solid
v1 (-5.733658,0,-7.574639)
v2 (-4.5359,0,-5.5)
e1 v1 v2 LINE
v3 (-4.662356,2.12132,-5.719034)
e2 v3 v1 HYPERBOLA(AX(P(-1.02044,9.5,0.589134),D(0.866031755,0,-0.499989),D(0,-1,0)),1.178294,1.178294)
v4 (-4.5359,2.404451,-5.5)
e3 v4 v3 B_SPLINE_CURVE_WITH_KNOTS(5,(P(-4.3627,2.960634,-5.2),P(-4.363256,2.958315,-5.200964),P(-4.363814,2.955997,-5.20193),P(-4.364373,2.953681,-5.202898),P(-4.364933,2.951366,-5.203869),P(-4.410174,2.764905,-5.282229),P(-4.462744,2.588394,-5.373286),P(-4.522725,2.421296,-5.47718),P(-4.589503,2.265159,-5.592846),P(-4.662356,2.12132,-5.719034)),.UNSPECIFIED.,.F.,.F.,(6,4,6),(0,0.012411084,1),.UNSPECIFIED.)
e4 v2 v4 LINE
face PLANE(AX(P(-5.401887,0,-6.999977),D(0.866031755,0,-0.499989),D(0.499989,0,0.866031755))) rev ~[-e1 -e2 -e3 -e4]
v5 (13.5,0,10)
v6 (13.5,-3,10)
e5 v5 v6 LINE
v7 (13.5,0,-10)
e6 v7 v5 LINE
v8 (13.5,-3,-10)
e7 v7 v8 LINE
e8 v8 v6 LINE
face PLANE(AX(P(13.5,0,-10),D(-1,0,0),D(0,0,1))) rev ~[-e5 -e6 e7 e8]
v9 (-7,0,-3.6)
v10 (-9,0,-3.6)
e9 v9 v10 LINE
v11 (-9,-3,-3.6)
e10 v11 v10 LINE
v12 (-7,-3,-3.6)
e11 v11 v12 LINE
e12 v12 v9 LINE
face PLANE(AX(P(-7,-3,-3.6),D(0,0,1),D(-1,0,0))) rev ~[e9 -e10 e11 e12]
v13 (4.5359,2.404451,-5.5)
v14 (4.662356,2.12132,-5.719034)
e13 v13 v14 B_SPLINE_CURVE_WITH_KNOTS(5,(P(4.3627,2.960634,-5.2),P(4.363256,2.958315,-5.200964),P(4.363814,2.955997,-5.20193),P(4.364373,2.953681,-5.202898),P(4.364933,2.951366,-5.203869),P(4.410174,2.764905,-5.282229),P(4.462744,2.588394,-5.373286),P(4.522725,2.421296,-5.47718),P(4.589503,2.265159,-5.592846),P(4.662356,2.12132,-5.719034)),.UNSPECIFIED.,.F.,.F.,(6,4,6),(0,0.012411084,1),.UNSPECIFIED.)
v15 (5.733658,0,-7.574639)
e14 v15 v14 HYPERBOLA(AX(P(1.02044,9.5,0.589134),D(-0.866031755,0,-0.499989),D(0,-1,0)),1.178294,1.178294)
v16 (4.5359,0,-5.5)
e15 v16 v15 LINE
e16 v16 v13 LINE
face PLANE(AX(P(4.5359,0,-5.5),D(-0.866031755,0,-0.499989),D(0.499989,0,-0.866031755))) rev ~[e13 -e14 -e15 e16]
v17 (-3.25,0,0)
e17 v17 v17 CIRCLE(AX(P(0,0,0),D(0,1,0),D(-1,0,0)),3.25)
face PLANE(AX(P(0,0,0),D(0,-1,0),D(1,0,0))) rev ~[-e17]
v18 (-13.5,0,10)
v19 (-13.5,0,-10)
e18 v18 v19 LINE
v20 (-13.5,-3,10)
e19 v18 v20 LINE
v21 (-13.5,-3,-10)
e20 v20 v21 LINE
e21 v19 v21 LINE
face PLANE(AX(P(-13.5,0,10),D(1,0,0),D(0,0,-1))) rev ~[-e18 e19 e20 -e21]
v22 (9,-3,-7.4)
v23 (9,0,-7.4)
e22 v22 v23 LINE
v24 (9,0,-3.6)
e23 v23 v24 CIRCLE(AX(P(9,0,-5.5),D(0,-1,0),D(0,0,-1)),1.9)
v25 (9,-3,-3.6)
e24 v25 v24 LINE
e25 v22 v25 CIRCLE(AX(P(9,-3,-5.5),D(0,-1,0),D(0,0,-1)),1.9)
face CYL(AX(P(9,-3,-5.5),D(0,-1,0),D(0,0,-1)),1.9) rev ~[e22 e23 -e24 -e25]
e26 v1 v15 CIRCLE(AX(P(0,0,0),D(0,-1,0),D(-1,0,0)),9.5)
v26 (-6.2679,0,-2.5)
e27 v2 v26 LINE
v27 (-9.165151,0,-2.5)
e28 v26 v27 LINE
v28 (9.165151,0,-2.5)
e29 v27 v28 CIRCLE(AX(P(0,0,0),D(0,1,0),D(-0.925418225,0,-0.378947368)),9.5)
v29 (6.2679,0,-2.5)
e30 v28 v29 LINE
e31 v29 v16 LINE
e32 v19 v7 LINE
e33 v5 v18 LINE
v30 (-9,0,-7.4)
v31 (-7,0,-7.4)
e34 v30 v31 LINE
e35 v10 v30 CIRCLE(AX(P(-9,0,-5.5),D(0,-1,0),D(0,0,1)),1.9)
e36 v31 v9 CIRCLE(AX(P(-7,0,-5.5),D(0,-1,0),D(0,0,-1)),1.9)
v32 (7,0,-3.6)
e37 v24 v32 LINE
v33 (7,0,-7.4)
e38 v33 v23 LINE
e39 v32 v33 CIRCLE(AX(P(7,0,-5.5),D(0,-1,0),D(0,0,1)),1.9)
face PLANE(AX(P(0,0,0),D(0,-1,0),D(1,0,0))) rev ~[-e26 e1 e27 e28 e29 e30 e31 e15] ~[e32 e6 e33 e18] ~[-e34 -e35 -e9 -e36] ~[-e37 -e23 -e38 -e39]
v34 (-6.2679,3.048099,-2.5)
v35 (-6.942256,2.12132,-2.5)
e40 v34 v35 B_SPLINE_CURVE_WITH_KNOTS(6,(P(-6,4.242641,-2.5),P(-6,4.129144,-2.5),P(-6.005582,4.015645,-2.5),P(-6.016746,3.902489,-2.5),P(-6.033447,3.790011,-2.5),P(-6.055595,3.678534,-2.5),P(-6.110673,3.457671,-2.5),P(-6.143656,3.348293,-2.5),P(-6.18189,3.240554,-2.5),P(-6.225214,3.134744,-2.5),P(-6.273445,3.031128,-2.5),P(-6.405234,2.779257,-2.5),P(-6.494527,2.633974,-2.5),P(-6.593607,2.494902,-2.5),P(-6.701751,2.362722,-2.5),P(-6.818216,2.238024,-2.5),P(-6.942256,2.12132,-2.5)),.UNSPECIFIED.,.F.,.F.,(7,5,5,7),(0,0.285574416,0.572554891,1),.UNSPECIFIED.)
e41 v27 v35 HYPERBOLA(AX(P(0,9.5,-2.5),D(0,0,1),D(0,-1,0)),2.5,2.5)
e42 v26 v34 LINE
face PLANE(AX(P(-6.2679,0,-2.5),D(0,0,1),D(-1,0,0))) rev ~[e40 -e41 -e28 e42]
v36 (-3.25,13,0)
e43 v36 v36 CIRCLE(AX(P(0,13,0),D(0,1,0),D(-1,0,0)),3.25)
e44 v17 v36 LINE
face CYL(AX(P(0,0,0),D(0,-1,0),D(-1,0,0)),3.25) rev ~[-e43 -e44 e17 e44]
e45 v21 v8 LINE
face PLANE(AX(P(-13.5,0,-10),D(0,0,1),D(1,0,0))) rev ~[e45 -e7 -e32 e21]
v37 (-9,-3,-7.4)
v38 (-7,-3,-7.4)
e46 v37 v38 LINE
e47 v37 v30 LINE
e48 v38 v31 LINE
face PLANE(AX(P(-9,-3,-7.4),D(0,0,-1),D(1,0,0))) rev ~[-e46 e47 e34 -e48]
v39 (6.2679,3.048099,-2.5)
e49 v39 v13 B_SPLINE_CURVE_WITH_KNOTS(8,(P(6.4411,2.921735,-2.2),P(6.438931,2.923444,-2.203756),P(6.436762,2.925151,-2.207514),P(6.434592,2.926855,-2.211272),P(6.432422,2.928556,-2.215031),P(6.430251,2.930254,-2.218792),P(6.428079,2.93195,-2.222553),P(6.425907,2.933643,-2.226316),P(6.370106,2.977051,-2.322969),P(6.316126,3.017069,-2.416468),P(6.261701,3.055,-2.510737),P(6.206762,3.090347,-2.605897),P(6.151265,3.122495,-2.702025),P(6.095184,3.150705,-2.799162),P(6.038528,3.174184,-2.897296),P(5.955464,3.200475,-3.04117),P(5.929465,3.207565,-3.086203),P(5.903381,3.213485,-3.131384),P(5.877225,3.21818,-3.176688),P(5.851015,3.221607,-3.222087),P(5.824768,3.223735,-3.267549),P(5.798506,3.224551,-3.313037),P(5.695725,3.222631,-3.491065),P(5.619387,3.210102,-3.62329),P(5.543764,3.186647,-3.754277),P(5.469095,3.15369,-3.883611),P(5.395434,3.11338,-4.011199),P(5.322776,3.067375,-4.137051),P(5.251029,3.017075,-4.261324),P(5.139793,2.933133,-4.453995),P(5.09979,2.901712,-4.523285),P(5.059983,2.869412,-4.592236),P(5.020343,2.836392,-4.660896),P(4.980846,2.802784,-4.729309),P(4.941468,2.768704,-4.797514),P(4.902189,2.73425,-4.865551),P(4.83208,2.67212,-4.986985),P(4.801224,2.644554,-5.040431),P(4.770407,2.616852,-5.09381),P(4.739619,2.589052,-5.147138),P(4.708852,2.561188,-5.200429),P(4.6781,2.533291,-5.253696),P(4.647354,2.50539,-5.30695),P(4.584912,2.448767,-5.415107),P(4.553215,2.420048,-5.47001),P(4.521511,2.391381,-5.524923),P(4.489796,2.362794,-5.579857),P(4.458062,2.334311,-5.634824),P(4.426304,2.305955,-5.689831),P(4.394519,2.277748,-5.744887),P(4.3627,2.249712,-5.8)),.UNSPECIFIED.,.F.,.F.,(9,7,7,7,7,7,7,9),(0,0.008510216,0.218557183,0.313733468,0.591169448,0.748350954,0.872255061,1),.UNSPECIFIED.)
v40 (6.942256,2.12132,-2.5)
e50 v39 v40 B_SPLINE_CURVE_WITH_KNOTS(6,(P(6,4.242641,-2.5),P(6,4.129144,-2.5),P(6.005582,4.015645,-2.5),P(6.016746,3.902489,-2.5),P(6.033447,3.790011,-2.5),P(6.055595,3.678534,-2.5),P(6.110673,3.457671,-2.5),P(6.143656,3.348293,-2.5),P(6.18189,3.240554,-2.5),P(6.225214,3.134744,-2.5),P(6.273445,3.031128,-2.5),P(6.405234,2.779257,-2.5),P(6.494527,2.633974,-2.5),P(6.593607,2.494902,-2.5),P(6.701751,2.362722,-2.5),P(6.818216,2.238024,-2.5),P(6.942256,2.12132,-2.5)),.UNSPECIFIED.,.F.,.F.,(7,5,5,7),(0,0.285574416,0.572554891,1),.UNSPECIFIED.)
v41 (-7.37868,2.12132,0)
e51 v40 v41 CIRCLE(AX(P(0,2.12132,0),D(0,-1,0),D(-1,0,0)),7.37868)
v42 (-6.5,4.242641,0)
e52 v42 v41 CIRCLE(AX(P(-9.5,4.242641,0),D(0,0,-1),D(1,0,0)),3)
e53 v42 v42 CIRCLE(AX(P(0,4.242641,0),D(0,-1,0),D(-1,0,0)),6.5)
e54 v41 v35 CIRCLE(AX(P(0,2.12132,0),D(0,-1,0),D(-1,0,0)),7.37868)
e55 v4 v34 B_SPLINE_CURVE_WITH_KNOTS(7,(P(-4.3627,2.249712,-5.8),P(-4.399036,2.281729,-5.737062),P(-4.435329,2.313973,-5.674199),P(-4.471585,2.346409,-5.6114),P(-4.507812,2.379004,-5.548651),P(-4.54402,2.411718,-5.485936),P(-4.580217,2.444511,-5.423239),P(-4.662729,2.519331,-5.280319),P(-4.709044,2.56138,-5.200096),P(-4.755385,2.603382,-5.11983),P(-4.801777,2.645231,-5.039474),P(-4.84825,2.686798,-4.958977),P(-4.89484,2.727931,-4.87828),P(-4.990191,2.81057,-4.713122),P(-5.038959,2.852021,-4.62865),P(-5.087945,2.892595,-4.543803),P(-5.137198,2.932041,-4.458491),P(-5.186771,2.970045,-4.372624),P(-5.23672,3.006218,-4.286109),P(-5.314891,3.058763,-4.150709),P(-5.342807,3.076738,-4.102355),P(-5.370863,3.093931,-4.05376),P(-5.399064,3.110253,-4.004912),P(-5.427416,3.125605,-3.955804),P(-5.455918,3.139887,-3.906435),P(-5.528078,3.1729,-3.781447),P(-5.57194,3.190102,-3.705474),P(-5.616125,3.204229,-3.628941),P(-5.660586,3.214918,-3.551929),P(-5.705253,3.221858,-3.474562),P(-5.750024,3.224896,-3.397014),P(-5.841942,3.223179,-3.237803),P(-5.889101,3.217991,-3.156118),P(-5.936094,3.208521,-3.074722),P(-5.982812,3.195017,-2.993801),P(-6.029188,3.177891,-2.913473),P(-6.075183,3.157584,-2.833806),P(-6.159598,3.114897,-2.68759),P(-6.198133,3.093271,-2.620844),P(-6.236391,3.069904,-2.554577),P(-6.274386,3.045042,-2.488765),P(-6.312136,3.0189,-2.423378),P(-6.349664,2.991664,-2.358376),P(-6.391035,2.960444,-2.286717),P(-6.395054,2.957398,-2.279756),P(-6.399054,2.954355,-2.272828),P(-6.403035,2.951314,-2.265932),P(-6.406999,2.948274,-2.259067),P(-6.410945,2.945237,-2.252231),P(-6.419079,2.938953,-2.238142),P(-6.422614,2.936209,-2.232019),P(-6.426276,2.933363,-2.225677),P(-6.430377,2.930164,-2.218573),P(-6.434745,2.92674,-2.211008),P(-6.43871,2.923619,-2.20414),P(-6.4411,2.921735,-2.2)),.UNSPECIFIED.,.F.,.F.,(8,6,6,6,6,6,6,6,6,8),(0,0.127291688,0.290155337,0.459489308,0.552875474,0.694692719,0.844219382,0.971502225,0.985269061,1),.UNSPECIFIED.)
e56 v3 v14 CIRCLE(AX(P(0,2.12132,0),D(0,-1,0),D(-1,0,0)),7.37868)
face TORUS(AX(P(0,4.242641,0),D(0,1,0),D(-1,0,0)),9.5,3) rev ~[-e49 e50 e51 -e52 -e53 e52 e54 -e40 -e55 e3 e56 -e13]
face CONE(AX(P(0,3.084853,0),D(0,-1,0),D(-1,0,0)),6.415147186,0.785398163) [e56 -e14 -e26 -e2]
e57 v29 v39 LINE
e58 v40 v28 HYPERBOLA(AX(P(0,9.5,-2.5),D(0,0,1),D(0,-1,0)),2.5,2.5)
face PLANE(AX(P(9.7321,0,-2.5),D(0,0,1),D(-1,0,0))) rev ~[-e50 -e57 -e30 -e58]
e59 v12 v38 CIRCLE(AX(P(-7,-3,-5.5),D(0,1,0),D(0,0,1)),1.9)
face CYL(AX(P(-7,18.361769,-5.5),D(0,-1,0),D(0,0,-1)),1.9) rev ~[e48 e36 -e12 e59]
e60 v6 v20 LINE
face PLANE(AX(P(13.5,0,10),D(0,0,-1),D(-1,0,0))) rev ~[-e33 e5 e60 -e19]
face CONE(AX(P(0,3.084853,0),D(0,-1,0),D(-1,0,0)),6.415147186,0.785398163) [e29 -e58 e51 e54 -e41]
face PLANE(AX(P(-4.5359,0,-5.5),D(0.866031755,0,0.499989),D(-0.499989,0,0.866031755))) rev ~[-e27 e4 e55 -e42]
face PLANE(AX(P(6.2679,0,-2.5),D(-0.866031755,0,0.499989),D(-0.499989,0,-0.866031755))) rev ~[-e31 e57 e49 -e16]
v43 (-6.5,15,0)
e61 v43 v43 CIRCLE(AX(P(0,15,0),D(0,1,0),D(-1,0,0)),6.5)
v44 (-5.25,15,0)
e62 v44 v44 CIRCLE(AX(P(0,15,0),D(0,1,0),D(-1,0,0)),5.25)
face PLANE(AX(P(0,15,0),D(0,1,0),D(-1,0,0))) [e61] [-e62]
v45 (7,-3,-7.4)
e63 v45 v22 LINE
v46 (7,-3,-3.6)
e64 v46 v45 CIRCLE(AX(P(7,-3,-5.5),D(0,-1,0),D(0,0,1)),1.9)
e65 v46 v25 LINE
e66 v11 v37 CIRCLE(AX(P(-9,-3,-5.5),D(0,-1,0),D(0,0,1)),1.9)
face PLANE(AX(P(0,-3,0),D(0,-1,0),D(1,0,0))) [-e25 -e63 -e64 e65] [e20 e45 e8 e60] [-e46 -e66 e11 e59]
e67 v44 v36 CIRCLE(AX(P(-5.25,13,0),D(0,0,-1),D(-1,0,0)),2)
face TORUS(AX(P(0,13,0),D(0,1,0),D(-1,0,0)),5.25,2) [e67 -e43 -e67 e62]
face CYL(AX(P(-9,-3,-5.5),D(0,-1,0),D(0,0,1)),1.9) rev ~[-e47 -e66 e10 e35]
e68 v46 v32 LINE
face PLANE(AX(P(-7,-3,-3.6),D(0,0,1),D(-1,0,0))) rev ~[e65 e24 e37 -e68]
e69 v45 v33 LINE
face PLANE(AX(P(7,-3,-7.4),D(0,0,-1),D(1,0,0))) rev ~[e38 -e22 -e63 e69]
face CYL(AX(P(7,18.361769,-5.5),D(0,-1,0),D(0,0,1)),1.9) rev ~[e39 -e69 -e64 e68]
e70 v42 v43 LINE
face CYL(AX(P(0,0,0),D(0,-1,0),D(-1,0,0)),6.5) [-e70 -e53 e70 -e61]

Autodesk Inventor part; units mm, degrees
ref_plane "YZ Plane" through (0, 0, 0) normal (1, 0, 0) x (0, 1, 0)
ref_plane "XZ Plane" through (0, 0, 0) normal (0, 1, 0) x (-1, 0, 0)
ref_plane "XY Plane" through (0, 0, 0) normal (0, 0, 1) x (1, 0, 0)
sketch "Schizzo1" plane through (0, 0, 0) normal (0, 1, 0) x (-1, 0, 0)
  circle A0 centre (0, 0) radius 3.25
  circle A1 centre (0, 0) radius 6.5
  dimension "d0" = 6.5
  dimension "d1" = 13
extrude "Estrusione1" add sketch "Schizzo1" along normal blind 15
sketch "Schizzo2" plane through (0, 0, 0) normal (0, -1, 0) x (1, 0, 0)
  line L0 (-13.5, -10) -> (13.5, -10)
  line L1 (13.5, -10) -> (13.5, 10)
  line L2 (13.5, 10) -> (-13.5, 10)
  line L3 (-13.5, 10) -> (-13.5, -10)
  line L4 (-13.5, -10) -> (13.5, 10) construction
  line L5 (13.5, -10) -> (-13.5, 10) construction
  point P0 (0, 0)
  point P1 (0, 0)
  point P2 (0, 0)
  dimension "d4" = 20
  dimension "d5" = 27
extrude "Estrusione2" add sketch "Schizzo2" along normal blind 3
sketch "Schizzo3" plane through (0, -3, 0) normal (0, -1, 0) x (1, 0, 0)
  line L0 (0, 0) -> (-8, 0)
  line L1 (0, 0) -> (8, 0) construction
  line L2 (-8, 0) -> (-8, -5.5)
  line L3 (0, 0) -> (8, 0)
  line L4 (0, 0) -> (8, 0) construction
  line L5 (8, 0) -> (8, -5.5)
  circle A0 centre (0, 0) radius 6.5 projected
  circle A1 centre (0, 0) radius 9.5 projected
  line L6 (-20.3813, -5.5) -> (-15.9716, -5.5)
  line L7 (-20.3813, -5.5) -> (-15.9716, -5.5) construction
  line L8 (-9, -5.5) -> (-7, -5.5)
  line L9 (-9, -5.5) -> (-7, -5.5) construction
  line L10 (-9, -5.5) -> (-7, -5.5) construction
  line L11 (-9, -7.4) -> (-7, -7.4)
  line L12 (-7, -3.6) -> (-9, -3.6)
  arc A2 (-9, -3.6) -> (-9, -7.4) centre (-9, -5.5) ccw
  arc A3 (-7, -7.4) -> (-7, -3.6) centre (-7, -5.5) ccw
  line L13 (7, -5.5) -> (9, -5.5)
  line L14 (7, -5.5) -> (9, -5.5) construction
  line L15 (7, -5.5) -> (9, -5.5) construction
  line L16 (7, -7.4) -> (9, -7.4)
  line L17 (9, -3.6) -> (7, -3.6)
  arc A4 (7, -3.6) -> (7, -7.4) centre (7, -5.5) ccw
  arc A5 (9, -7.4) -> (9, -3.6) centre (9, -5.5) ccw
  point P0 (2.8723, -8)
  point P1 (13.5, -10)
  point P2 (-13.5, -10)
  point P3 (8, -5.5)
  point P4 (0, -10)
  point P5 (0, 10)
  dimension "d21" = 8
  dimension "d22" = 180
  dimension "d23" = 5.5
  dimension "d24" = 90
  dimension "d25" = 8
  dimension "d26" = 0
  dimension "d27" = 5.5
  dimension "d28" = 90
  dimension "d31" = 0
  dimension "d32" = 0
  dimension "d33" = 2
  dimension "d34" = 3.8
  dimension "d35" = 0
  dimension "d36" = 3.8
  dimension "d37" = 2
extrude "Estrusione3" cut sketch "Schizzo3" against normal blind 10 contours L12 A3 A1 L2 | L2 A1 L12 | L17 A1 L5 | L5 A1 A4 L17 | A1 L8 L2 | L2 L8 A1 A3 L11 A2 L12 | A1 L17 A5 L16 A4 L13 L5 | L5 L13 A1
fillet "Raccordo2" radius 2 1 edges at (3.25, 15, 0)
chamfer "Smusso2" distance 3 angle 45 1 edges at (6.5, 0, 0)
fillet "Raccordo3" radius 3 1 edges at (6.5, 3, 0)
sketch "Schizzo4" plane through (0, 0, 0) normal (0, 1, 0) x (1, 0, 0)
  arc A0 (9, 3.6) -> (9, 7.4) centre (9, 5.5) ccw projected
  arc A1 (7, 7.4) -> (7, 3.6) centre (7, 5.5) ccw projected
  line L0 (9, 5.5) -> (7, 5.5)
  arc A2 (-9, 7.4) -> (-9, 3.6) centre (-9, 5.5) ccw projected
  arc A3 (-7, 3.6) -> (-7, 7.4) centre (-7, 5.5) ccw projected
  line L1 (-9, 5.5) -> (-7, 5.5)
  circle A4 centre (8, 5.5) radius 3
  circle A5 centre (-8, 5.5) radius 3
  line L2 (6.2679, 2.5) -> (4.5359, 5.5)
  line L3 (4.5359, 5.5) -> (6.2679, 8.5)
  line L4 (6.2679, 8.5) -> (9.7321, 8.5)
  line L5 (9.7321, 8.5) -> (11.4641, 5.5)
  line L6 (11.4641, 5.5) -> (9.7321, 2.5)
  line L7 (9.7321, 2.5) -> (6.2679, 2.5)
  line L8 (-6.2679, 8.5) -> (-4.5359, 5.5)
  line L9 (-4.5359, 5.5) -> (-6.2679, 2.5)
  line L10 (-6.2679, 2.5) -> (-9.7321, 2.5)
  line L11 (-9.7321, 2.5) -> (-11.4641, 5.5)
  line L12 (-11.4641, 5.5) -> (-9.7321, 8.5)
  line L13 (-9.7321, 8.5) -> (-6.2679, 8.5)
  point P0 (0, 0)
  point P1 (9.3191, 3.627)
  point P2 (-9.3191, 3.627)
  point P3 (8, 2.5)
  point P4 (-8, 8.5)
  dimension "d45" = 6
  dimension "d46" = 6
extrude "Estrusione6" cut sketch "Schizzo4" along normal blind 6
properties part number "11_Connettore_MPU"
